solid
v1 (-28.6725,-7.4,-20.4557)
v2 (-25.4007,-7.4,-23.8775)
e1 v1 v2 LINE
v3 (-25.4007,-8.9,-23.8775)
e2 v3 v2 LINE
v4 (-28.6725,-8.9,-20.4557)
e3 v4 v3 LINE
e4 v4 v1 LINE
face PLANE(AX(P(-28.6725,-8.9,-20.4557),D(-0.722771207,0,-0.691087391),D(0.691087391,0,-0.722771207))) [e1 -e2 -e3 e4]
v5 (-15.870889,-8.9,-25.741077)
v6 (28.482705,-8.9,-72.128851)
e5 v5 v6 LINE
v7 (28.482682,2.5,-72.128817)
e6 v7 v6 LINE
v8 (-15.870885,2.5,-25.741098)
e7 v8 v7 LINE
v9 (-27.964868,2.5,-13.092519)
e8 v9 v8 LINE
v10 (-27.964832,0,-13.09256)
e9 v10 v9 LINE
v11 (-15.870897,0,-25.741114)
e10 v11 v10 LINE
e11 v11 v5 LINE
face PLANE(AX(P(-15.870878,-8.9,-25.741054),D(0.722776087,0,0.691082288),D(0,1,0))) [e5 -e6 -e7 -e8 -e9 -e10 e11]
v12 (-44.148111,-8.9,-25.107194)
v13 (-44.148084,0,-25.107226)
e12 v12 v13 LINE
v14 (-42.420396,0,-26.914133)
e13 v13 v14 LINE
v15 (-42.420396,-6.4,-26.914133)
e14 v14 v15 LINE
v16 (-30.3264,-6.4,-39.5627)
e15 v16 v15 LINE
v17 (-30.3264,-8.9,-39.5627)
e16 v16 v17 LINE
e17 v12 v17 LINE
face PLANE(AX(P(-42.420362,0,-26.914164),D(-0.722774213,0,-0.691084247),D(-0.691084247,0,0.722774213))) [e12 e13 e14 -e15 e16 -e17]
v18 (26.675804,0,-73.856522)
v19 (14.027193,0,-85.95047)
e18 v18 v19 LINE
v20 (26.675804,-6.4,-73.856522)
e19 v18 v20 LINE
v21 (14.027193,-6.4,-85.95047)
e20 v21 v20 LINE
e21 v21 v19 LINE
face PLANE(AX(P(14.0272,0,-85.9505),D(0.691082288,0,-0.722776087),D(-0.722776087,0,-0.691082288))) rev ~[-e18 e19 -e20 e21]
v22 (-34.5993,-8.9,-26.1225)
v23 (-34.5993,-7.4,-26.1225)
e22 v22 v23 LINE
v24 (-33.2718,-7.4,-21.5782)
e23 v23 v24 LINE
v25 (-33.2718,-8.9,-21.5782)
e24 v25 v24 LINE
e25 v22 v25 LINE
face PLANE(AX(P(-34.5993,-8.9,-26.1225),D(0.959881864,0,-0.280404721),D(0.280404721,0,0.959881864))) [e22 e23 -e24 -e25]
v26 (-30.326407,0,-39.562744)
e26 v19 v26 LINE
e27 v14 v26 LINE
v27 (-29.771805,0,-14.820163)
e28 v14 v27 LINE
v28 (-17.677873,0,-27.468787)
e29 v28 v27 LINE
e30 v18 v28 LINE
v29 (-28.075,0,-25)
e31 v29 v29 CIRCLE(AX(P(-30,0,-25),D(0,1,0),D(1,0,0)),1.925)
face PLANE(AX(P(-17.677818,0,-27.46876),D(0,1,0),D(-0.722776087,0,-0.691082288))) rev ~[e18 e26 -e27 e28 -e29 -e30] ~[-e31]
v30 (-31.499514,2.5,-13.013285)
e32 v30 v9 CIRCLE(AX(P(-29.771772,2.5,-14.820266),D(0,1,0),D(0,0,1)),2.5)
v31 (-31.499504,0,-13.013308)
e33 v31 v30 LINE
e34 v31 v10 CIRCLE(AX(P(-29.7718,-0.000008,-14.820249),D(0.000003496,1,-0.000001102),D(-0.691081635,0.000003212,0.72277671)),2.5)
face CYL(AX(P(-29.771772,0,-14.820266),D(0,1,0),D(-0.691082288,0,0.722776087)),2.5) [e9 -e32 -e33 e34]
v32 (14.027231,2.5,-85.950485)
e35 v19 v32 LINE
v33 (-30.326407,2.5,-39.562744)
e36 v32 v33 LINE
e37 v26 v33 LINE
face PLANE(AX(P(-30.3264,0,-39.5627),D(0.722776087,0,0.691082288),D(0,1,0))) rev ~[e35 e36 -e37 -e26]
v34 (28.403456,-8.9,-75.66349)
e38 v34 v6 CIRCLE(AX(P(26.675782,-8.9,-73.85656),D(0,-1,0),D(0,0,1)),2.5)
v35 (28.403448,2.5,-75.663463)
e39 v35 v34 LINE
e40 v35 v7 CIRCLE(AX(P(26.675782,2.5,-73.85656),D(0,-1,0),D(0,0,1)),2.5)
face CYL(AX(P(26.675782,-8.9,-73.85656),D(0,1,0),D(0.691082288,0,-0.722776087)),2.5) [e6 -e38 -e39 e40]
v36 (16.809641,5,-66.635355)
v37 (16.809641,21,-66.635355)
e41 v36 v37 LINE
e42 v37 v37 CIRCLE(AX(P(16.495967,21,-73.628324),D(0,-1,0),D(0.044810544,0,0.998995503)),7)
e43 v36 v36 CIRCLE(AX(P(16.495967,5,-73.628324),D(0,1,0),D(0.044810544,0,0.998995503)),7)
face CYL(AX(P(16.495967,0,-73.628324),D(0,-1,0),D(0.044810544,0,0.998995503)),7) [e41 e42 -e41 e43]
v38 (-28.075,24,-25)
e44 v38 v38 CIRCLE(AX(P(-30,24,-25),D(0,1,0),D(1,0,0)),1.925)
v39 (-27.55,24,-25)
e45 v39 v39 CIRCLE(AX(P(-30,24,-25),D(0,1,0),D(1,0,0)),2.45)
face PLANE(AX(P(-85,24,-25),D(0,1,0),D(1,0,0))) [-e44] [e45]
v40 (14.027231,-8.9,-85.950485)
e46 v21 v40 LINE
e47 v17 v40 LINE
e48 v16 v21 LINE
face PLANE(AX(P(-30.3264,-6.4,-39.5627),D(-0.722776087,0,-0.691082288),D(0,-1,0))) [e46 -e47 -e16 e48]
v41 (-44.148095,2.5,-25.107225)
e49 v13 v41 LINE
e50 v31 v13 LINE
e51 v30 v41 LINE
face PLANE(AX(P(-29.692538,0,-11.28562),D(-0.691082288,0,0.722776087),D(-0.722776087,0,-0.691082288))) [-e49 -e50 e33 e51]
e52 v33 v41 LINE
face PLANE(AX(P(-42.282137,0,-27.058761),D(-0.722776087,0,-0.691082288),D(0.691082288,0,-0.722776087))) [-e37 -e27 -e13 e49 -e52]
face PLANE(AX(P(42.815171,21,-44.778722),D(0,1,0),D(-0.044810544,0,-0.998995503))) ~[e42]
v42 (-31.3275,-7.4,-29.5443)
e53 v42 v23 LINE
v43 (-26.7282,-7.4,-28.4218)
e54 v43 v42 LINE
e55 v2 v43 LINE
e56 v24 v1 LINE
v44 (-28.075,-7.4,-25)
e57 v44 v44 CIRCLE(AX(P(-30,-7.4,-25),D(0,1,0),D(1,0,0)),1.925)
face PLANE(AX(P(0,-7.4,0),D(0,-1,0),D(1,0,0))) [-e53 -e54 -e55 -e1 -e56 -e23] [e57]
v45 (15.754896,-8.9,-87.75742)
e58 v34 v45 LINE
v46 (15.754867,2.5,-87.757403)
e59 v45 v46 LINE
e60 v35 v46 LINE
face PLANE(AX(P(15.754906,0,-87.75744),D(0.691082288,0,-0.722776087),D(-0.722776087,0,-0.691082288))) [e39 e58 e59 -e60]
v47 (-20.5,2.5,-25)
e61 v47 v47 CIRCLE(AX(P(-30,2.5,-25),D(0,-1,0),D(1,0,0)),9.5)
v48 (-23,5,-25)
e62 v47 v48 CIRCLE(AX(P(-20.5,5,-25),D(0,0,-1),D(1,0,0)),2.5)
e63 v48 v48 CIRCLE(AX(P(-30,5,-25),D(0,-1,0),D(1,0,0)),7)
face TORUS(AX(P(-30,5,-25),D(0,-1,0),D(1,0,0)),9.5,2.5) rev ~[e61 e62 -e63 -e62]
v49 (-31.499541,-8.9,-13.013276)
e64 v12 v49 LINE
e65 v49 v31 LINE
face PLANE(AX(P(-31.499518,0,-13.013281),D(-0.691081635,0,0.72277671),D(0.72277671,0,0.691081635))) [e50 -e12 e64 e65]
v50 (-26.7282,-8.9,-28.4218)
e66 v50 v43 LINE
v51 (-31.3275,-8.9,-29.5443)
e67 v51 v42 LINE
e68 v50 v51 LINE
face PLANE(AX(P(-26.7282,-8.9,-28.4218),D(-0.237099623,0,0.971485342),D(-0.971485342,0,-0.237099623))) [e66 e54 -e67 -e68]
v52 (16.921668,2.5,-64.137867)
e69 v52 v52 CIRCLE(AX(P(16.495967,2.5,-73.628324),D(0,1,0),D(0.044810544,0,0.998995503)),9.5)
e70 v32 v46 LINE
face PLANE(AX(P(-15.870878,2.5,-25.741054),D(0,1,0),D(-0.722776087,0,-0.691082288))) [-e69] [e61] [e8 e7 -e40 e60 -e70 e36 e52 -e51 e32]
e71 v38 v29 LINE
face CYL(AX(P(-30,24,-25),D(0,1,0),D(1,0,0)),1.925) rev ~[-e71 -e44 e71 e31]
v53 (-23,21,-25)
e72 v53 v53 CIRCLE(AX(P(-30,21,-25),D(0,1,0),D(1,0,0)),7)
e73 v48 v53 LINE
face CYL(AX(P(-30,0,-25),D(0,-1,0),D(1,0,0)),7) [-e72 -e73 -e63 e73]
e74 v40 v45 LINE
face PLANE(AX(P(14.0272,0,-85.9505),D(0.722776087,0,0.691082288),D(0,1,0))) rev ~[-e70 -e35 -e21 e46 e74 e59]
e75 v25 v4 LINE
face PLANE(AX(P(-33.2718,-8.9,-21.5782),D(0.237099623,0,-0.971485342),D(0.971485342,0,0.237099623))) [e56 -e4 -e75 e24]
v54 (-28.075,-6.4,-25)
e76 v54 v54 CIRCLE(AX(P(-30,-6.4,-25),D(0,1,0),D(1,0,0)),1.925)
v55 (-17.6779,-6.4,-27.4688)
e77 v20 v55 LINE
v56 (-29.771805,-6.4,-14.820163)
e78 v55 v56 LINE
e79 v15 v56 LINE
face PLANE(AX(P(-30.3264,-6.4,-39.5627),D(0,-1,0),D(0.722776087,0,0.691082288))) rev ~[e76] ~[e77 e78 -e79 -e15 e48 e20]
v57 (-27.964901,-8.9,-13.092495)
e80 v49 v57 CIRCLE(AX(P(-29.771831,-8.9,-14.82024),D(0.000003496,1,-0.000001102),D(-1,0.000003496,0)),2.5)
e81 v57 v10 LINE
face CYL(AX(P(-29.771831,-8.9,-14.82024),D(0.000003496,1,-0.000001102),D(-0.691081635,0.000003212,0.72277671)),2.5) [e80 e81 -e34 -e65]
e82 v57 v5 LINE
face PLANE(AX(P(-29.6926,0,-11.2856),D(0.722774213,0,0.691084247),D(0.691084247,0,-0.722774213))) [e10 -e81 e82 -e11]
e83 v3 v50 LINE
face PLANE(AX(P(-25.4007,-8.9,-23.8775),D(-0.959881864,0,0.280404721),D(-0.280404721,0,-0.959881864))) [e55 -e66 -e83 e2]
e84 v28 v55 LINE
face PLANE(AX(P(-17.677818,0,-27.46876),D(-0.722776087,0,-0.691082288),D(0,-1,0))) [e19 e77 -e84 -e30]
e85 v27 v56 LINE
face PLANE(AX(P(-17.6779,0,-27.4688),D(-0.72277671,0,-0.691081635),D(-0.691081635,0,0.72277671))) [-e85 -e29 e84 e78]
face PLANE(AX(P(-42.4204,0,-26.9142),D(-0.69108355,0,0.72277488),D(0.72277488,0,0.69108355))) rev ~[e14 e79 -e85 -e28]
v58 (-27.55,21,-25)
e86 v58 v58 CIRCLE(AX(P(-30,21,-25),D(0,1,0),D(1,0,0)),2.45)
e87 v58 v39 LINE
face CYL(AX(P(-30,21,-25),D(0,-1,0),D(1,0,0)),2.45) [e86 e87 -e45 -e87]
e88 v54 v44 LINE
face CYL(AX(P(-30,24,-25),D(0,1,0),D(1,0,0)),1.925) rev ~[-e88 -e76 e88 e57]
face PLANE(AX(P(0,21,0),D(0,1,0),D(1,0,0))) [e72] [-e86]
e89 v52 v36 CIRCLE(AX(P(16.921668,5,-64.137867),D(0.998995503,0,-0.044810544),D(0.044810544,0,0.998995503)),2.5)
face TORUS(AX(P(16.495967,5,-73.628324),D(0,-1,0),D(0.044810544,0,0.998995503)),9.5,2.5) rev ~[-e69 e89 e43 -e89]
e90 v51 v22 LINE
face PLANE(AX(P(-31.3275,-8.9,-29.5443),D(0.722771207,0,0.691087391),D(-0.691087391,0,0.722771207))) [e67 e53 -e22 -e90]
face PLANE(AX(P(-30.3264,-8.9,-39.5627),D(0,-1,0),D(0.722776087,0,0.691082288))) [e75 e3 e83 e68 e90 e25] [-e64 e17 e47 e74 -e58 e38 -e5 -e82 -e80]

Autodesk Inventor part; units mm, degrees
sketch "Sketch1" plane through (0, 0, 0) normal (0, 1, 0) x (-1, 0, 0)
  line L0 (0, 0) -> (100, 0)
  line L1 (100, 0) -> (100, -50)
  line L2 (100, -50) -> (0, -50)
  line L3 (0, -50) -> (0, 0)
  dimension "d0" = 100
  dimension "d1" = 50
extrude "Extrusion1" add sketch "Sketch1" along normal blind 3
sketch "Sketch2" plane through (0, 3, 0) normal (0, 1, 0) x (1, 0, 0)
  circle A0 centre (-85, 25) radius 7
  circle A1 centre (-30, 25) radius 7
  line L0 (-100, 50) -> (-100, 0) projected
  line L1 (0, 0) -> (0, 50) projected
  line L2 (0, 50) -> (-100, 50) projected
  dimension "d4" = 14
  dimension "d5" = 14
  dimension "d6" = 15
  dimension "d7" = 30
  dimension "d8" = 25
  dimension "d9" = 25
extrude "Extrusion2" add sketch "Sketch2" along normal blind 18
sketch "Sketch3" plane through (-85, 21, -25) normal (0, 1, 0) x (1, 0, 0)
  circle A0 centre (0, 0) radius 7 projected
  circle A1 centre (55, 0) radius 7 projected
  circle A2 centre (0, 0) radius 2.875
  circle A3 centre (55, 0) radius 2.45
  point P0 (85, -25)
  dimension "d12" = 5.75
  dimension "d13" = 4.9
extrude "Extrusion3" add sketch "Sketch3" along normal blind 3 contours A2 | A3
sketch "Sketch5" plane through (-30, 24, -25) normal (0, 1, 0) x (1, 0, 0)
  circle A0 centre (0, 0) radius 1.925
  point P0 (30, -25)
  dimension "d20" = 3.85
extrude "Extrusion5" cut sketch "Sketch5" against normal up to surface (24 mm away)
sketch "Sketch7" plane through (0, 0, 0) normal (0, -1, 0) x (1, 0, 0)
  line L0 (2.4404, 5.5552) -> (-105.2601, 5.5552)
  line L1 (-105.2601, 5.5552) -> (-105.2601, -59.9514)
  line L2 (-105.2601, -59.9514) -> (2.4404, -59.9514)
  line L3 (2.4404, -59.9514) -> (2.4404, 5.5552)
  circle A0 centre (-30, -25) radius 2.45 projected
  circle A1 centre (-30, -25) radius 7 projected
  point P0 (0, 0)
extrude "Extrusion6" cut sketch "Sketch7" against normal blind 50 contours L3 L2 L1 L0
ref_plane "Work Plane1" through (-108.1719, 0, -146.2869) normal (0, 1, 0) x (0.6910823, 0, -0.7227761)
sketch "Sketch8" plane through (-108.1719, 0, -146.2869) normal (0, 1, 0) x (0.6910823, 0, -0.7227761)
  line L0 (-40.64, -147.32) -> (40.64, -147.32) projected
  line L1 (-40.64, 147.32) -> (-40.64, -147.32) projected
  line L2 (-43.34, -130.02) -> (-40.84, -130.02)
  line L3 (-40.84, -130.02) -> (-40.84, -150.02)
  line L4 (-40.84, -150.02) -> (-43.34, -150.02)
  line L5 (-43.34, -150.02) -> (-43.34, -130.02)
  line L6 (-23.34, -147.52) -> (-40.84, -147.52)
  line L7 (-40.84, -147.52) -> (-40.84, -150.02)
  line L8 (-23.34, -147.52) -> (-23.34, -150.02)
  line L9 (-23.34, -150.02) -> (-40.84, -150.02)
  line L10 (-40.84, -130.02) -> (-23.34, -130.02)
  line L11 (-23.34, -130.02) -> (-23.34, -147.52)
  arc A0 (-33.6873, -142.3194) -> (-35.0746, -141.7135) centre (-33.64, -140.32) ccw projected
  circle A1 centre (-33.64, -140.32) radius 3.8 projected
  circle A2 centre (-33.64, -140.32) radius 7 projected
  point P0 (-30.9769, -179.2803)
  point P1 (-40.84, -150.02)
  dimension "d26" = 0.2
  dimension "d27" = 0.2
  dimension "d29" = 20
  dimension "d30" = 2.5
  dimension "d31" = 2.5
  dimension "d32" = 20
extrude "Extrusion7" add sketch "Sketch8" along normal blind 2.5 contours L1 A2 L0 | L0 L11 L6 L3 L10 L1 | A2 L1 L10 L11 L0 | L8 L9 L3 L6 | L3 L4 L5 L2
sketch "Sketch9" plane through (0, 0, 0) normal (0, -1, 0) x (1, 0, 0)
  line L0 (-29.6926, -11.2856) -> (-15.8709, -25.7411) projected
  line L1 (-15.8709, -25.7411) -> (-17.6779, -27.4688)
  line L2 (-15.8709, -25.7411) -> (-30.3264, -39.5627) projected
  line L3 (-17.6779, -27.4688) -> (-31.4995, -13.0133)
  line L4 (-30.3264, -39.5627) -> (-44.1481, -25.1072) projected
  line L5 (-44.1481, -25.1072) -> (-42.4204, -26.9142)
  line L6 (-42.4204, -26.9142) -> (-29.7718, -14.8202)
  line L7 (-30.3264, -39.5627) -> (-44.1481, -25.1072) projected
  line L8 (-15.8709, -25.7411) -> (-30.3264, -39.5627) projected
  line L9 (-29.6926, -11.2856) -> (-15.8709, -25.7411) projected
  line L10 (-44.1481, -25.1072) -> (-29.6926, -11.2856) projected
  circle A0 centre (-30, -25) radius 1.925 projected
  point P0 (0, 0)
  dimension "d35" = 2.5
  dimension "d36" = 0
  dimension "d37" = 2.5
extrude "Extrusion8" add sketch "Sketch9" along normal blind 6.4 contours L0 L1 L3 L10 | L3 L6 L4 L10
sketch "Sketch10" plane through (0, -6.4, 0) normal (0, -1, 0) x (1, 0, 0)
  line L0 (-30.3264, -39.5627) -> (-44.1481, -25.1072) projected
  line L1 (-44.1481, -25.1072) -> (-29.6926, -11.2856) projected
  line L2 (-29.6926, -11.2856) -> (-15.8709, -25.7411) projected
  line L3 (-15.8709, -25.7411) -> (-30.3264, -39.5627) projected
  circle A0 centre (-30, -25) radius 7 projected
  circle A1 centre (-30, -25) radius 1.925 projected
  point P0 (0, 0)
extrude "Extrusion9" add sketch "Sketch10" along normal blind 2.5 contours L0 L1 L2 L3 | A0
fillet "Fillet1" radius 2.5 1 edges at (-29.6926, -3.2, -11.2856)
fillet "Fillet2" radius 2.5 1 edges at (-37, 2.5, -25)
sketch "Sketch11" plane through (0, -8.9, 0) normal (0, -1, 0) x (1, 0, 0)
  circle A0 centre (-30, -25) radius 1.925 projected
  arc A1 (-27.9649, -13.0925) -> (-31.4995, -13.0133) centre (-29.7718, -14.8202) ccw projected
  line L0 (-31.4995, -13.0133) -> (-44.1481, -25.1072) projected
  line L1 (-44.1481, -25.1072) -> (-30.3264, -39.5627) projected
  line L2 (-30.3264, -39.5627) -> (-15.8709, -25.7411) projected
  line L3 (-15.8709, -25.7411) -> (-27.9649, -13.0925) projected
  circle A2 centre (-30, -25) radius 2.45 projected
  line L4 (-31.3275, -29.5443) -> (-34.5993, -26.1225)
  line L5 (-34.5993, -26.1225) -> (-33.2718, -21.5782)
  line L6 (-33.2718, -21.5782) -> (-28.6725, -20.4557)
  line L7 (-28.6725, -20.4557) -> (-25.4007, -23.8775)
  line L8 (-25.4007, -23.8775) -> (-26.7282, -28.4218)
  line L9 (-26.7282, -28.4218) -> (-31.3275, -29.5443)
  line L10 (-15.8709, -25.7411) -> (-27.9649, -13.0925) projected
  point P0 (0, 0)
  dimension "d44" = 8.2
extrude "Extrusion10" cut sketch "Sketch11" against normal blind 1.5 contours L4 L5 L6 L7 L8 L9
sketch "Sketch12" plane through (-30.3264, 0, -39.5627) normal (0.6910823, 0, -0.7227761) x (-0.7227761, 0, -0.6910823)
  line L0 (-17.5, 0) -> (0, 0) projected
  line L1 (0, 0) -> (0, 2.5) projected
  line L2 (-20, 2.5) -> (0, 2.5) projected
  line L3 (-20, -8.9) -> (-20, 2.5) projected
  line L4 (0, -8.9) -> (-20, -8.9) projected
  line L5 (0, -6.4) -> (0, -8.9) projected
  line L6 (0, -6.4) -> (-17.5, -6.4) projected
  line L7 (-17.5, 0) -> (-17.5, -6.4) projected
  point P0 (-49.2603, 0)
ref_plane "Work Plane2" through (-186.5657, -6, -277.4707) normal (0.6910823, 0, -0.7227761) x (0, 1, 0)
extrude "Extrusion11" add sketch "Sketch12" along normal blind 64.18
sketch "Sketch13" plane through (14.0272, 0, -85.9505) normal (0.6910823, 0, -0.7227761) x (-0.7227761, 0, -0.6910823)
  line L0 (0, 2.5) -> (-17.5, 2.5) projected
  line L1 (-17.5, -8.9) -> (0, -8.9) projected
  line L2 (0, -8.9) -> (0, 2.5) projected
  line L3 (-20, -8.9) -> (-20, 2.5) projected
  line L4 (-17.5, -6.4) -> (-17.5, 0) projected
  line L5 (-17.5, 0) -> (0, 0) projected
  line L6 (0, 0) -> (0, 2.5) projected
  line L7 (0, 2.5) -> (-20, 2.5) projected
  line L8 (-20, 2.5) -> (-20, -8.9) projected
  line L9 (-20, -8.9) -> (0, -8.9) projected
  line L10 (0, -8.9) -> (0, -6.4) projected
  line L11 (0, -6.4) -> (-17.5, -6.4) projected
  point P0 (-49.2603, 0)
  point P1 (-20, 2.5)
extrude "Extrusion12" add sketch "Sketch13" along normal blind 2.5
fillet "Fillet3" radius 2.5 1 edges at (30.2104, -3.2, -73.9358)
ref_plane "Work Plane3" through (-14.1966, -8.9, -56.4323) normal (-0.6910823, 0, 0.7227761) x (0.7227761, 0, 0.6910823)
mirror "Mirror1" about plane through (-14.1966, -8.9, -56.4323) normal (-0.6910823, 0, 0.7227761)
sketch "Sketch14" plane through (16.496, 24, -73.6284) normal (0, 1, 0) x (1, 0, 0)
  circle A0 centre (0, 0) radius 1.925 projected
  circle A1 centre (0, 0) radius 1.925 projected
  circle A2 centre (0, 0) radius 2.45 projected
  point P0 (-16.496, -73.6284)
ref_plane "Work Plane4" through (-246.9785, 21, -281.7123) normal (0, -1, 0) x (0.7227761, 0, 0.6910823)
extrude "Extrusion13" cut sketch "Sketch14" against normal up to surface (3 mm away)
sketch "Sketch15" plane through (16.496, 21, -73.6284) normal (0, 1, 0) x (1, 0, 0)
  circle A0 centre (0, 0) radius 7 projected
  point P0 (-16.496, -73.6284)
ref_plane "Work Plane5" through (-242.7369, 0, -277.4707) normal (0, 1, 0) x (-0.6910823, 0, 0.7227761)
extrude "Extrusion14" add sketch "Sketch15" against normal up to surface (21 mm away)
extrude "Extrusion15" cut sketch "Sketch11" against normal blind 1.5 contours A0 | A2 | L4 L5 L6 L7 L8 L9
extrude "Extrusion16" cut sketch "Sketch5" against normal up to surface (32.9 mm away)
properties part number "Base"
